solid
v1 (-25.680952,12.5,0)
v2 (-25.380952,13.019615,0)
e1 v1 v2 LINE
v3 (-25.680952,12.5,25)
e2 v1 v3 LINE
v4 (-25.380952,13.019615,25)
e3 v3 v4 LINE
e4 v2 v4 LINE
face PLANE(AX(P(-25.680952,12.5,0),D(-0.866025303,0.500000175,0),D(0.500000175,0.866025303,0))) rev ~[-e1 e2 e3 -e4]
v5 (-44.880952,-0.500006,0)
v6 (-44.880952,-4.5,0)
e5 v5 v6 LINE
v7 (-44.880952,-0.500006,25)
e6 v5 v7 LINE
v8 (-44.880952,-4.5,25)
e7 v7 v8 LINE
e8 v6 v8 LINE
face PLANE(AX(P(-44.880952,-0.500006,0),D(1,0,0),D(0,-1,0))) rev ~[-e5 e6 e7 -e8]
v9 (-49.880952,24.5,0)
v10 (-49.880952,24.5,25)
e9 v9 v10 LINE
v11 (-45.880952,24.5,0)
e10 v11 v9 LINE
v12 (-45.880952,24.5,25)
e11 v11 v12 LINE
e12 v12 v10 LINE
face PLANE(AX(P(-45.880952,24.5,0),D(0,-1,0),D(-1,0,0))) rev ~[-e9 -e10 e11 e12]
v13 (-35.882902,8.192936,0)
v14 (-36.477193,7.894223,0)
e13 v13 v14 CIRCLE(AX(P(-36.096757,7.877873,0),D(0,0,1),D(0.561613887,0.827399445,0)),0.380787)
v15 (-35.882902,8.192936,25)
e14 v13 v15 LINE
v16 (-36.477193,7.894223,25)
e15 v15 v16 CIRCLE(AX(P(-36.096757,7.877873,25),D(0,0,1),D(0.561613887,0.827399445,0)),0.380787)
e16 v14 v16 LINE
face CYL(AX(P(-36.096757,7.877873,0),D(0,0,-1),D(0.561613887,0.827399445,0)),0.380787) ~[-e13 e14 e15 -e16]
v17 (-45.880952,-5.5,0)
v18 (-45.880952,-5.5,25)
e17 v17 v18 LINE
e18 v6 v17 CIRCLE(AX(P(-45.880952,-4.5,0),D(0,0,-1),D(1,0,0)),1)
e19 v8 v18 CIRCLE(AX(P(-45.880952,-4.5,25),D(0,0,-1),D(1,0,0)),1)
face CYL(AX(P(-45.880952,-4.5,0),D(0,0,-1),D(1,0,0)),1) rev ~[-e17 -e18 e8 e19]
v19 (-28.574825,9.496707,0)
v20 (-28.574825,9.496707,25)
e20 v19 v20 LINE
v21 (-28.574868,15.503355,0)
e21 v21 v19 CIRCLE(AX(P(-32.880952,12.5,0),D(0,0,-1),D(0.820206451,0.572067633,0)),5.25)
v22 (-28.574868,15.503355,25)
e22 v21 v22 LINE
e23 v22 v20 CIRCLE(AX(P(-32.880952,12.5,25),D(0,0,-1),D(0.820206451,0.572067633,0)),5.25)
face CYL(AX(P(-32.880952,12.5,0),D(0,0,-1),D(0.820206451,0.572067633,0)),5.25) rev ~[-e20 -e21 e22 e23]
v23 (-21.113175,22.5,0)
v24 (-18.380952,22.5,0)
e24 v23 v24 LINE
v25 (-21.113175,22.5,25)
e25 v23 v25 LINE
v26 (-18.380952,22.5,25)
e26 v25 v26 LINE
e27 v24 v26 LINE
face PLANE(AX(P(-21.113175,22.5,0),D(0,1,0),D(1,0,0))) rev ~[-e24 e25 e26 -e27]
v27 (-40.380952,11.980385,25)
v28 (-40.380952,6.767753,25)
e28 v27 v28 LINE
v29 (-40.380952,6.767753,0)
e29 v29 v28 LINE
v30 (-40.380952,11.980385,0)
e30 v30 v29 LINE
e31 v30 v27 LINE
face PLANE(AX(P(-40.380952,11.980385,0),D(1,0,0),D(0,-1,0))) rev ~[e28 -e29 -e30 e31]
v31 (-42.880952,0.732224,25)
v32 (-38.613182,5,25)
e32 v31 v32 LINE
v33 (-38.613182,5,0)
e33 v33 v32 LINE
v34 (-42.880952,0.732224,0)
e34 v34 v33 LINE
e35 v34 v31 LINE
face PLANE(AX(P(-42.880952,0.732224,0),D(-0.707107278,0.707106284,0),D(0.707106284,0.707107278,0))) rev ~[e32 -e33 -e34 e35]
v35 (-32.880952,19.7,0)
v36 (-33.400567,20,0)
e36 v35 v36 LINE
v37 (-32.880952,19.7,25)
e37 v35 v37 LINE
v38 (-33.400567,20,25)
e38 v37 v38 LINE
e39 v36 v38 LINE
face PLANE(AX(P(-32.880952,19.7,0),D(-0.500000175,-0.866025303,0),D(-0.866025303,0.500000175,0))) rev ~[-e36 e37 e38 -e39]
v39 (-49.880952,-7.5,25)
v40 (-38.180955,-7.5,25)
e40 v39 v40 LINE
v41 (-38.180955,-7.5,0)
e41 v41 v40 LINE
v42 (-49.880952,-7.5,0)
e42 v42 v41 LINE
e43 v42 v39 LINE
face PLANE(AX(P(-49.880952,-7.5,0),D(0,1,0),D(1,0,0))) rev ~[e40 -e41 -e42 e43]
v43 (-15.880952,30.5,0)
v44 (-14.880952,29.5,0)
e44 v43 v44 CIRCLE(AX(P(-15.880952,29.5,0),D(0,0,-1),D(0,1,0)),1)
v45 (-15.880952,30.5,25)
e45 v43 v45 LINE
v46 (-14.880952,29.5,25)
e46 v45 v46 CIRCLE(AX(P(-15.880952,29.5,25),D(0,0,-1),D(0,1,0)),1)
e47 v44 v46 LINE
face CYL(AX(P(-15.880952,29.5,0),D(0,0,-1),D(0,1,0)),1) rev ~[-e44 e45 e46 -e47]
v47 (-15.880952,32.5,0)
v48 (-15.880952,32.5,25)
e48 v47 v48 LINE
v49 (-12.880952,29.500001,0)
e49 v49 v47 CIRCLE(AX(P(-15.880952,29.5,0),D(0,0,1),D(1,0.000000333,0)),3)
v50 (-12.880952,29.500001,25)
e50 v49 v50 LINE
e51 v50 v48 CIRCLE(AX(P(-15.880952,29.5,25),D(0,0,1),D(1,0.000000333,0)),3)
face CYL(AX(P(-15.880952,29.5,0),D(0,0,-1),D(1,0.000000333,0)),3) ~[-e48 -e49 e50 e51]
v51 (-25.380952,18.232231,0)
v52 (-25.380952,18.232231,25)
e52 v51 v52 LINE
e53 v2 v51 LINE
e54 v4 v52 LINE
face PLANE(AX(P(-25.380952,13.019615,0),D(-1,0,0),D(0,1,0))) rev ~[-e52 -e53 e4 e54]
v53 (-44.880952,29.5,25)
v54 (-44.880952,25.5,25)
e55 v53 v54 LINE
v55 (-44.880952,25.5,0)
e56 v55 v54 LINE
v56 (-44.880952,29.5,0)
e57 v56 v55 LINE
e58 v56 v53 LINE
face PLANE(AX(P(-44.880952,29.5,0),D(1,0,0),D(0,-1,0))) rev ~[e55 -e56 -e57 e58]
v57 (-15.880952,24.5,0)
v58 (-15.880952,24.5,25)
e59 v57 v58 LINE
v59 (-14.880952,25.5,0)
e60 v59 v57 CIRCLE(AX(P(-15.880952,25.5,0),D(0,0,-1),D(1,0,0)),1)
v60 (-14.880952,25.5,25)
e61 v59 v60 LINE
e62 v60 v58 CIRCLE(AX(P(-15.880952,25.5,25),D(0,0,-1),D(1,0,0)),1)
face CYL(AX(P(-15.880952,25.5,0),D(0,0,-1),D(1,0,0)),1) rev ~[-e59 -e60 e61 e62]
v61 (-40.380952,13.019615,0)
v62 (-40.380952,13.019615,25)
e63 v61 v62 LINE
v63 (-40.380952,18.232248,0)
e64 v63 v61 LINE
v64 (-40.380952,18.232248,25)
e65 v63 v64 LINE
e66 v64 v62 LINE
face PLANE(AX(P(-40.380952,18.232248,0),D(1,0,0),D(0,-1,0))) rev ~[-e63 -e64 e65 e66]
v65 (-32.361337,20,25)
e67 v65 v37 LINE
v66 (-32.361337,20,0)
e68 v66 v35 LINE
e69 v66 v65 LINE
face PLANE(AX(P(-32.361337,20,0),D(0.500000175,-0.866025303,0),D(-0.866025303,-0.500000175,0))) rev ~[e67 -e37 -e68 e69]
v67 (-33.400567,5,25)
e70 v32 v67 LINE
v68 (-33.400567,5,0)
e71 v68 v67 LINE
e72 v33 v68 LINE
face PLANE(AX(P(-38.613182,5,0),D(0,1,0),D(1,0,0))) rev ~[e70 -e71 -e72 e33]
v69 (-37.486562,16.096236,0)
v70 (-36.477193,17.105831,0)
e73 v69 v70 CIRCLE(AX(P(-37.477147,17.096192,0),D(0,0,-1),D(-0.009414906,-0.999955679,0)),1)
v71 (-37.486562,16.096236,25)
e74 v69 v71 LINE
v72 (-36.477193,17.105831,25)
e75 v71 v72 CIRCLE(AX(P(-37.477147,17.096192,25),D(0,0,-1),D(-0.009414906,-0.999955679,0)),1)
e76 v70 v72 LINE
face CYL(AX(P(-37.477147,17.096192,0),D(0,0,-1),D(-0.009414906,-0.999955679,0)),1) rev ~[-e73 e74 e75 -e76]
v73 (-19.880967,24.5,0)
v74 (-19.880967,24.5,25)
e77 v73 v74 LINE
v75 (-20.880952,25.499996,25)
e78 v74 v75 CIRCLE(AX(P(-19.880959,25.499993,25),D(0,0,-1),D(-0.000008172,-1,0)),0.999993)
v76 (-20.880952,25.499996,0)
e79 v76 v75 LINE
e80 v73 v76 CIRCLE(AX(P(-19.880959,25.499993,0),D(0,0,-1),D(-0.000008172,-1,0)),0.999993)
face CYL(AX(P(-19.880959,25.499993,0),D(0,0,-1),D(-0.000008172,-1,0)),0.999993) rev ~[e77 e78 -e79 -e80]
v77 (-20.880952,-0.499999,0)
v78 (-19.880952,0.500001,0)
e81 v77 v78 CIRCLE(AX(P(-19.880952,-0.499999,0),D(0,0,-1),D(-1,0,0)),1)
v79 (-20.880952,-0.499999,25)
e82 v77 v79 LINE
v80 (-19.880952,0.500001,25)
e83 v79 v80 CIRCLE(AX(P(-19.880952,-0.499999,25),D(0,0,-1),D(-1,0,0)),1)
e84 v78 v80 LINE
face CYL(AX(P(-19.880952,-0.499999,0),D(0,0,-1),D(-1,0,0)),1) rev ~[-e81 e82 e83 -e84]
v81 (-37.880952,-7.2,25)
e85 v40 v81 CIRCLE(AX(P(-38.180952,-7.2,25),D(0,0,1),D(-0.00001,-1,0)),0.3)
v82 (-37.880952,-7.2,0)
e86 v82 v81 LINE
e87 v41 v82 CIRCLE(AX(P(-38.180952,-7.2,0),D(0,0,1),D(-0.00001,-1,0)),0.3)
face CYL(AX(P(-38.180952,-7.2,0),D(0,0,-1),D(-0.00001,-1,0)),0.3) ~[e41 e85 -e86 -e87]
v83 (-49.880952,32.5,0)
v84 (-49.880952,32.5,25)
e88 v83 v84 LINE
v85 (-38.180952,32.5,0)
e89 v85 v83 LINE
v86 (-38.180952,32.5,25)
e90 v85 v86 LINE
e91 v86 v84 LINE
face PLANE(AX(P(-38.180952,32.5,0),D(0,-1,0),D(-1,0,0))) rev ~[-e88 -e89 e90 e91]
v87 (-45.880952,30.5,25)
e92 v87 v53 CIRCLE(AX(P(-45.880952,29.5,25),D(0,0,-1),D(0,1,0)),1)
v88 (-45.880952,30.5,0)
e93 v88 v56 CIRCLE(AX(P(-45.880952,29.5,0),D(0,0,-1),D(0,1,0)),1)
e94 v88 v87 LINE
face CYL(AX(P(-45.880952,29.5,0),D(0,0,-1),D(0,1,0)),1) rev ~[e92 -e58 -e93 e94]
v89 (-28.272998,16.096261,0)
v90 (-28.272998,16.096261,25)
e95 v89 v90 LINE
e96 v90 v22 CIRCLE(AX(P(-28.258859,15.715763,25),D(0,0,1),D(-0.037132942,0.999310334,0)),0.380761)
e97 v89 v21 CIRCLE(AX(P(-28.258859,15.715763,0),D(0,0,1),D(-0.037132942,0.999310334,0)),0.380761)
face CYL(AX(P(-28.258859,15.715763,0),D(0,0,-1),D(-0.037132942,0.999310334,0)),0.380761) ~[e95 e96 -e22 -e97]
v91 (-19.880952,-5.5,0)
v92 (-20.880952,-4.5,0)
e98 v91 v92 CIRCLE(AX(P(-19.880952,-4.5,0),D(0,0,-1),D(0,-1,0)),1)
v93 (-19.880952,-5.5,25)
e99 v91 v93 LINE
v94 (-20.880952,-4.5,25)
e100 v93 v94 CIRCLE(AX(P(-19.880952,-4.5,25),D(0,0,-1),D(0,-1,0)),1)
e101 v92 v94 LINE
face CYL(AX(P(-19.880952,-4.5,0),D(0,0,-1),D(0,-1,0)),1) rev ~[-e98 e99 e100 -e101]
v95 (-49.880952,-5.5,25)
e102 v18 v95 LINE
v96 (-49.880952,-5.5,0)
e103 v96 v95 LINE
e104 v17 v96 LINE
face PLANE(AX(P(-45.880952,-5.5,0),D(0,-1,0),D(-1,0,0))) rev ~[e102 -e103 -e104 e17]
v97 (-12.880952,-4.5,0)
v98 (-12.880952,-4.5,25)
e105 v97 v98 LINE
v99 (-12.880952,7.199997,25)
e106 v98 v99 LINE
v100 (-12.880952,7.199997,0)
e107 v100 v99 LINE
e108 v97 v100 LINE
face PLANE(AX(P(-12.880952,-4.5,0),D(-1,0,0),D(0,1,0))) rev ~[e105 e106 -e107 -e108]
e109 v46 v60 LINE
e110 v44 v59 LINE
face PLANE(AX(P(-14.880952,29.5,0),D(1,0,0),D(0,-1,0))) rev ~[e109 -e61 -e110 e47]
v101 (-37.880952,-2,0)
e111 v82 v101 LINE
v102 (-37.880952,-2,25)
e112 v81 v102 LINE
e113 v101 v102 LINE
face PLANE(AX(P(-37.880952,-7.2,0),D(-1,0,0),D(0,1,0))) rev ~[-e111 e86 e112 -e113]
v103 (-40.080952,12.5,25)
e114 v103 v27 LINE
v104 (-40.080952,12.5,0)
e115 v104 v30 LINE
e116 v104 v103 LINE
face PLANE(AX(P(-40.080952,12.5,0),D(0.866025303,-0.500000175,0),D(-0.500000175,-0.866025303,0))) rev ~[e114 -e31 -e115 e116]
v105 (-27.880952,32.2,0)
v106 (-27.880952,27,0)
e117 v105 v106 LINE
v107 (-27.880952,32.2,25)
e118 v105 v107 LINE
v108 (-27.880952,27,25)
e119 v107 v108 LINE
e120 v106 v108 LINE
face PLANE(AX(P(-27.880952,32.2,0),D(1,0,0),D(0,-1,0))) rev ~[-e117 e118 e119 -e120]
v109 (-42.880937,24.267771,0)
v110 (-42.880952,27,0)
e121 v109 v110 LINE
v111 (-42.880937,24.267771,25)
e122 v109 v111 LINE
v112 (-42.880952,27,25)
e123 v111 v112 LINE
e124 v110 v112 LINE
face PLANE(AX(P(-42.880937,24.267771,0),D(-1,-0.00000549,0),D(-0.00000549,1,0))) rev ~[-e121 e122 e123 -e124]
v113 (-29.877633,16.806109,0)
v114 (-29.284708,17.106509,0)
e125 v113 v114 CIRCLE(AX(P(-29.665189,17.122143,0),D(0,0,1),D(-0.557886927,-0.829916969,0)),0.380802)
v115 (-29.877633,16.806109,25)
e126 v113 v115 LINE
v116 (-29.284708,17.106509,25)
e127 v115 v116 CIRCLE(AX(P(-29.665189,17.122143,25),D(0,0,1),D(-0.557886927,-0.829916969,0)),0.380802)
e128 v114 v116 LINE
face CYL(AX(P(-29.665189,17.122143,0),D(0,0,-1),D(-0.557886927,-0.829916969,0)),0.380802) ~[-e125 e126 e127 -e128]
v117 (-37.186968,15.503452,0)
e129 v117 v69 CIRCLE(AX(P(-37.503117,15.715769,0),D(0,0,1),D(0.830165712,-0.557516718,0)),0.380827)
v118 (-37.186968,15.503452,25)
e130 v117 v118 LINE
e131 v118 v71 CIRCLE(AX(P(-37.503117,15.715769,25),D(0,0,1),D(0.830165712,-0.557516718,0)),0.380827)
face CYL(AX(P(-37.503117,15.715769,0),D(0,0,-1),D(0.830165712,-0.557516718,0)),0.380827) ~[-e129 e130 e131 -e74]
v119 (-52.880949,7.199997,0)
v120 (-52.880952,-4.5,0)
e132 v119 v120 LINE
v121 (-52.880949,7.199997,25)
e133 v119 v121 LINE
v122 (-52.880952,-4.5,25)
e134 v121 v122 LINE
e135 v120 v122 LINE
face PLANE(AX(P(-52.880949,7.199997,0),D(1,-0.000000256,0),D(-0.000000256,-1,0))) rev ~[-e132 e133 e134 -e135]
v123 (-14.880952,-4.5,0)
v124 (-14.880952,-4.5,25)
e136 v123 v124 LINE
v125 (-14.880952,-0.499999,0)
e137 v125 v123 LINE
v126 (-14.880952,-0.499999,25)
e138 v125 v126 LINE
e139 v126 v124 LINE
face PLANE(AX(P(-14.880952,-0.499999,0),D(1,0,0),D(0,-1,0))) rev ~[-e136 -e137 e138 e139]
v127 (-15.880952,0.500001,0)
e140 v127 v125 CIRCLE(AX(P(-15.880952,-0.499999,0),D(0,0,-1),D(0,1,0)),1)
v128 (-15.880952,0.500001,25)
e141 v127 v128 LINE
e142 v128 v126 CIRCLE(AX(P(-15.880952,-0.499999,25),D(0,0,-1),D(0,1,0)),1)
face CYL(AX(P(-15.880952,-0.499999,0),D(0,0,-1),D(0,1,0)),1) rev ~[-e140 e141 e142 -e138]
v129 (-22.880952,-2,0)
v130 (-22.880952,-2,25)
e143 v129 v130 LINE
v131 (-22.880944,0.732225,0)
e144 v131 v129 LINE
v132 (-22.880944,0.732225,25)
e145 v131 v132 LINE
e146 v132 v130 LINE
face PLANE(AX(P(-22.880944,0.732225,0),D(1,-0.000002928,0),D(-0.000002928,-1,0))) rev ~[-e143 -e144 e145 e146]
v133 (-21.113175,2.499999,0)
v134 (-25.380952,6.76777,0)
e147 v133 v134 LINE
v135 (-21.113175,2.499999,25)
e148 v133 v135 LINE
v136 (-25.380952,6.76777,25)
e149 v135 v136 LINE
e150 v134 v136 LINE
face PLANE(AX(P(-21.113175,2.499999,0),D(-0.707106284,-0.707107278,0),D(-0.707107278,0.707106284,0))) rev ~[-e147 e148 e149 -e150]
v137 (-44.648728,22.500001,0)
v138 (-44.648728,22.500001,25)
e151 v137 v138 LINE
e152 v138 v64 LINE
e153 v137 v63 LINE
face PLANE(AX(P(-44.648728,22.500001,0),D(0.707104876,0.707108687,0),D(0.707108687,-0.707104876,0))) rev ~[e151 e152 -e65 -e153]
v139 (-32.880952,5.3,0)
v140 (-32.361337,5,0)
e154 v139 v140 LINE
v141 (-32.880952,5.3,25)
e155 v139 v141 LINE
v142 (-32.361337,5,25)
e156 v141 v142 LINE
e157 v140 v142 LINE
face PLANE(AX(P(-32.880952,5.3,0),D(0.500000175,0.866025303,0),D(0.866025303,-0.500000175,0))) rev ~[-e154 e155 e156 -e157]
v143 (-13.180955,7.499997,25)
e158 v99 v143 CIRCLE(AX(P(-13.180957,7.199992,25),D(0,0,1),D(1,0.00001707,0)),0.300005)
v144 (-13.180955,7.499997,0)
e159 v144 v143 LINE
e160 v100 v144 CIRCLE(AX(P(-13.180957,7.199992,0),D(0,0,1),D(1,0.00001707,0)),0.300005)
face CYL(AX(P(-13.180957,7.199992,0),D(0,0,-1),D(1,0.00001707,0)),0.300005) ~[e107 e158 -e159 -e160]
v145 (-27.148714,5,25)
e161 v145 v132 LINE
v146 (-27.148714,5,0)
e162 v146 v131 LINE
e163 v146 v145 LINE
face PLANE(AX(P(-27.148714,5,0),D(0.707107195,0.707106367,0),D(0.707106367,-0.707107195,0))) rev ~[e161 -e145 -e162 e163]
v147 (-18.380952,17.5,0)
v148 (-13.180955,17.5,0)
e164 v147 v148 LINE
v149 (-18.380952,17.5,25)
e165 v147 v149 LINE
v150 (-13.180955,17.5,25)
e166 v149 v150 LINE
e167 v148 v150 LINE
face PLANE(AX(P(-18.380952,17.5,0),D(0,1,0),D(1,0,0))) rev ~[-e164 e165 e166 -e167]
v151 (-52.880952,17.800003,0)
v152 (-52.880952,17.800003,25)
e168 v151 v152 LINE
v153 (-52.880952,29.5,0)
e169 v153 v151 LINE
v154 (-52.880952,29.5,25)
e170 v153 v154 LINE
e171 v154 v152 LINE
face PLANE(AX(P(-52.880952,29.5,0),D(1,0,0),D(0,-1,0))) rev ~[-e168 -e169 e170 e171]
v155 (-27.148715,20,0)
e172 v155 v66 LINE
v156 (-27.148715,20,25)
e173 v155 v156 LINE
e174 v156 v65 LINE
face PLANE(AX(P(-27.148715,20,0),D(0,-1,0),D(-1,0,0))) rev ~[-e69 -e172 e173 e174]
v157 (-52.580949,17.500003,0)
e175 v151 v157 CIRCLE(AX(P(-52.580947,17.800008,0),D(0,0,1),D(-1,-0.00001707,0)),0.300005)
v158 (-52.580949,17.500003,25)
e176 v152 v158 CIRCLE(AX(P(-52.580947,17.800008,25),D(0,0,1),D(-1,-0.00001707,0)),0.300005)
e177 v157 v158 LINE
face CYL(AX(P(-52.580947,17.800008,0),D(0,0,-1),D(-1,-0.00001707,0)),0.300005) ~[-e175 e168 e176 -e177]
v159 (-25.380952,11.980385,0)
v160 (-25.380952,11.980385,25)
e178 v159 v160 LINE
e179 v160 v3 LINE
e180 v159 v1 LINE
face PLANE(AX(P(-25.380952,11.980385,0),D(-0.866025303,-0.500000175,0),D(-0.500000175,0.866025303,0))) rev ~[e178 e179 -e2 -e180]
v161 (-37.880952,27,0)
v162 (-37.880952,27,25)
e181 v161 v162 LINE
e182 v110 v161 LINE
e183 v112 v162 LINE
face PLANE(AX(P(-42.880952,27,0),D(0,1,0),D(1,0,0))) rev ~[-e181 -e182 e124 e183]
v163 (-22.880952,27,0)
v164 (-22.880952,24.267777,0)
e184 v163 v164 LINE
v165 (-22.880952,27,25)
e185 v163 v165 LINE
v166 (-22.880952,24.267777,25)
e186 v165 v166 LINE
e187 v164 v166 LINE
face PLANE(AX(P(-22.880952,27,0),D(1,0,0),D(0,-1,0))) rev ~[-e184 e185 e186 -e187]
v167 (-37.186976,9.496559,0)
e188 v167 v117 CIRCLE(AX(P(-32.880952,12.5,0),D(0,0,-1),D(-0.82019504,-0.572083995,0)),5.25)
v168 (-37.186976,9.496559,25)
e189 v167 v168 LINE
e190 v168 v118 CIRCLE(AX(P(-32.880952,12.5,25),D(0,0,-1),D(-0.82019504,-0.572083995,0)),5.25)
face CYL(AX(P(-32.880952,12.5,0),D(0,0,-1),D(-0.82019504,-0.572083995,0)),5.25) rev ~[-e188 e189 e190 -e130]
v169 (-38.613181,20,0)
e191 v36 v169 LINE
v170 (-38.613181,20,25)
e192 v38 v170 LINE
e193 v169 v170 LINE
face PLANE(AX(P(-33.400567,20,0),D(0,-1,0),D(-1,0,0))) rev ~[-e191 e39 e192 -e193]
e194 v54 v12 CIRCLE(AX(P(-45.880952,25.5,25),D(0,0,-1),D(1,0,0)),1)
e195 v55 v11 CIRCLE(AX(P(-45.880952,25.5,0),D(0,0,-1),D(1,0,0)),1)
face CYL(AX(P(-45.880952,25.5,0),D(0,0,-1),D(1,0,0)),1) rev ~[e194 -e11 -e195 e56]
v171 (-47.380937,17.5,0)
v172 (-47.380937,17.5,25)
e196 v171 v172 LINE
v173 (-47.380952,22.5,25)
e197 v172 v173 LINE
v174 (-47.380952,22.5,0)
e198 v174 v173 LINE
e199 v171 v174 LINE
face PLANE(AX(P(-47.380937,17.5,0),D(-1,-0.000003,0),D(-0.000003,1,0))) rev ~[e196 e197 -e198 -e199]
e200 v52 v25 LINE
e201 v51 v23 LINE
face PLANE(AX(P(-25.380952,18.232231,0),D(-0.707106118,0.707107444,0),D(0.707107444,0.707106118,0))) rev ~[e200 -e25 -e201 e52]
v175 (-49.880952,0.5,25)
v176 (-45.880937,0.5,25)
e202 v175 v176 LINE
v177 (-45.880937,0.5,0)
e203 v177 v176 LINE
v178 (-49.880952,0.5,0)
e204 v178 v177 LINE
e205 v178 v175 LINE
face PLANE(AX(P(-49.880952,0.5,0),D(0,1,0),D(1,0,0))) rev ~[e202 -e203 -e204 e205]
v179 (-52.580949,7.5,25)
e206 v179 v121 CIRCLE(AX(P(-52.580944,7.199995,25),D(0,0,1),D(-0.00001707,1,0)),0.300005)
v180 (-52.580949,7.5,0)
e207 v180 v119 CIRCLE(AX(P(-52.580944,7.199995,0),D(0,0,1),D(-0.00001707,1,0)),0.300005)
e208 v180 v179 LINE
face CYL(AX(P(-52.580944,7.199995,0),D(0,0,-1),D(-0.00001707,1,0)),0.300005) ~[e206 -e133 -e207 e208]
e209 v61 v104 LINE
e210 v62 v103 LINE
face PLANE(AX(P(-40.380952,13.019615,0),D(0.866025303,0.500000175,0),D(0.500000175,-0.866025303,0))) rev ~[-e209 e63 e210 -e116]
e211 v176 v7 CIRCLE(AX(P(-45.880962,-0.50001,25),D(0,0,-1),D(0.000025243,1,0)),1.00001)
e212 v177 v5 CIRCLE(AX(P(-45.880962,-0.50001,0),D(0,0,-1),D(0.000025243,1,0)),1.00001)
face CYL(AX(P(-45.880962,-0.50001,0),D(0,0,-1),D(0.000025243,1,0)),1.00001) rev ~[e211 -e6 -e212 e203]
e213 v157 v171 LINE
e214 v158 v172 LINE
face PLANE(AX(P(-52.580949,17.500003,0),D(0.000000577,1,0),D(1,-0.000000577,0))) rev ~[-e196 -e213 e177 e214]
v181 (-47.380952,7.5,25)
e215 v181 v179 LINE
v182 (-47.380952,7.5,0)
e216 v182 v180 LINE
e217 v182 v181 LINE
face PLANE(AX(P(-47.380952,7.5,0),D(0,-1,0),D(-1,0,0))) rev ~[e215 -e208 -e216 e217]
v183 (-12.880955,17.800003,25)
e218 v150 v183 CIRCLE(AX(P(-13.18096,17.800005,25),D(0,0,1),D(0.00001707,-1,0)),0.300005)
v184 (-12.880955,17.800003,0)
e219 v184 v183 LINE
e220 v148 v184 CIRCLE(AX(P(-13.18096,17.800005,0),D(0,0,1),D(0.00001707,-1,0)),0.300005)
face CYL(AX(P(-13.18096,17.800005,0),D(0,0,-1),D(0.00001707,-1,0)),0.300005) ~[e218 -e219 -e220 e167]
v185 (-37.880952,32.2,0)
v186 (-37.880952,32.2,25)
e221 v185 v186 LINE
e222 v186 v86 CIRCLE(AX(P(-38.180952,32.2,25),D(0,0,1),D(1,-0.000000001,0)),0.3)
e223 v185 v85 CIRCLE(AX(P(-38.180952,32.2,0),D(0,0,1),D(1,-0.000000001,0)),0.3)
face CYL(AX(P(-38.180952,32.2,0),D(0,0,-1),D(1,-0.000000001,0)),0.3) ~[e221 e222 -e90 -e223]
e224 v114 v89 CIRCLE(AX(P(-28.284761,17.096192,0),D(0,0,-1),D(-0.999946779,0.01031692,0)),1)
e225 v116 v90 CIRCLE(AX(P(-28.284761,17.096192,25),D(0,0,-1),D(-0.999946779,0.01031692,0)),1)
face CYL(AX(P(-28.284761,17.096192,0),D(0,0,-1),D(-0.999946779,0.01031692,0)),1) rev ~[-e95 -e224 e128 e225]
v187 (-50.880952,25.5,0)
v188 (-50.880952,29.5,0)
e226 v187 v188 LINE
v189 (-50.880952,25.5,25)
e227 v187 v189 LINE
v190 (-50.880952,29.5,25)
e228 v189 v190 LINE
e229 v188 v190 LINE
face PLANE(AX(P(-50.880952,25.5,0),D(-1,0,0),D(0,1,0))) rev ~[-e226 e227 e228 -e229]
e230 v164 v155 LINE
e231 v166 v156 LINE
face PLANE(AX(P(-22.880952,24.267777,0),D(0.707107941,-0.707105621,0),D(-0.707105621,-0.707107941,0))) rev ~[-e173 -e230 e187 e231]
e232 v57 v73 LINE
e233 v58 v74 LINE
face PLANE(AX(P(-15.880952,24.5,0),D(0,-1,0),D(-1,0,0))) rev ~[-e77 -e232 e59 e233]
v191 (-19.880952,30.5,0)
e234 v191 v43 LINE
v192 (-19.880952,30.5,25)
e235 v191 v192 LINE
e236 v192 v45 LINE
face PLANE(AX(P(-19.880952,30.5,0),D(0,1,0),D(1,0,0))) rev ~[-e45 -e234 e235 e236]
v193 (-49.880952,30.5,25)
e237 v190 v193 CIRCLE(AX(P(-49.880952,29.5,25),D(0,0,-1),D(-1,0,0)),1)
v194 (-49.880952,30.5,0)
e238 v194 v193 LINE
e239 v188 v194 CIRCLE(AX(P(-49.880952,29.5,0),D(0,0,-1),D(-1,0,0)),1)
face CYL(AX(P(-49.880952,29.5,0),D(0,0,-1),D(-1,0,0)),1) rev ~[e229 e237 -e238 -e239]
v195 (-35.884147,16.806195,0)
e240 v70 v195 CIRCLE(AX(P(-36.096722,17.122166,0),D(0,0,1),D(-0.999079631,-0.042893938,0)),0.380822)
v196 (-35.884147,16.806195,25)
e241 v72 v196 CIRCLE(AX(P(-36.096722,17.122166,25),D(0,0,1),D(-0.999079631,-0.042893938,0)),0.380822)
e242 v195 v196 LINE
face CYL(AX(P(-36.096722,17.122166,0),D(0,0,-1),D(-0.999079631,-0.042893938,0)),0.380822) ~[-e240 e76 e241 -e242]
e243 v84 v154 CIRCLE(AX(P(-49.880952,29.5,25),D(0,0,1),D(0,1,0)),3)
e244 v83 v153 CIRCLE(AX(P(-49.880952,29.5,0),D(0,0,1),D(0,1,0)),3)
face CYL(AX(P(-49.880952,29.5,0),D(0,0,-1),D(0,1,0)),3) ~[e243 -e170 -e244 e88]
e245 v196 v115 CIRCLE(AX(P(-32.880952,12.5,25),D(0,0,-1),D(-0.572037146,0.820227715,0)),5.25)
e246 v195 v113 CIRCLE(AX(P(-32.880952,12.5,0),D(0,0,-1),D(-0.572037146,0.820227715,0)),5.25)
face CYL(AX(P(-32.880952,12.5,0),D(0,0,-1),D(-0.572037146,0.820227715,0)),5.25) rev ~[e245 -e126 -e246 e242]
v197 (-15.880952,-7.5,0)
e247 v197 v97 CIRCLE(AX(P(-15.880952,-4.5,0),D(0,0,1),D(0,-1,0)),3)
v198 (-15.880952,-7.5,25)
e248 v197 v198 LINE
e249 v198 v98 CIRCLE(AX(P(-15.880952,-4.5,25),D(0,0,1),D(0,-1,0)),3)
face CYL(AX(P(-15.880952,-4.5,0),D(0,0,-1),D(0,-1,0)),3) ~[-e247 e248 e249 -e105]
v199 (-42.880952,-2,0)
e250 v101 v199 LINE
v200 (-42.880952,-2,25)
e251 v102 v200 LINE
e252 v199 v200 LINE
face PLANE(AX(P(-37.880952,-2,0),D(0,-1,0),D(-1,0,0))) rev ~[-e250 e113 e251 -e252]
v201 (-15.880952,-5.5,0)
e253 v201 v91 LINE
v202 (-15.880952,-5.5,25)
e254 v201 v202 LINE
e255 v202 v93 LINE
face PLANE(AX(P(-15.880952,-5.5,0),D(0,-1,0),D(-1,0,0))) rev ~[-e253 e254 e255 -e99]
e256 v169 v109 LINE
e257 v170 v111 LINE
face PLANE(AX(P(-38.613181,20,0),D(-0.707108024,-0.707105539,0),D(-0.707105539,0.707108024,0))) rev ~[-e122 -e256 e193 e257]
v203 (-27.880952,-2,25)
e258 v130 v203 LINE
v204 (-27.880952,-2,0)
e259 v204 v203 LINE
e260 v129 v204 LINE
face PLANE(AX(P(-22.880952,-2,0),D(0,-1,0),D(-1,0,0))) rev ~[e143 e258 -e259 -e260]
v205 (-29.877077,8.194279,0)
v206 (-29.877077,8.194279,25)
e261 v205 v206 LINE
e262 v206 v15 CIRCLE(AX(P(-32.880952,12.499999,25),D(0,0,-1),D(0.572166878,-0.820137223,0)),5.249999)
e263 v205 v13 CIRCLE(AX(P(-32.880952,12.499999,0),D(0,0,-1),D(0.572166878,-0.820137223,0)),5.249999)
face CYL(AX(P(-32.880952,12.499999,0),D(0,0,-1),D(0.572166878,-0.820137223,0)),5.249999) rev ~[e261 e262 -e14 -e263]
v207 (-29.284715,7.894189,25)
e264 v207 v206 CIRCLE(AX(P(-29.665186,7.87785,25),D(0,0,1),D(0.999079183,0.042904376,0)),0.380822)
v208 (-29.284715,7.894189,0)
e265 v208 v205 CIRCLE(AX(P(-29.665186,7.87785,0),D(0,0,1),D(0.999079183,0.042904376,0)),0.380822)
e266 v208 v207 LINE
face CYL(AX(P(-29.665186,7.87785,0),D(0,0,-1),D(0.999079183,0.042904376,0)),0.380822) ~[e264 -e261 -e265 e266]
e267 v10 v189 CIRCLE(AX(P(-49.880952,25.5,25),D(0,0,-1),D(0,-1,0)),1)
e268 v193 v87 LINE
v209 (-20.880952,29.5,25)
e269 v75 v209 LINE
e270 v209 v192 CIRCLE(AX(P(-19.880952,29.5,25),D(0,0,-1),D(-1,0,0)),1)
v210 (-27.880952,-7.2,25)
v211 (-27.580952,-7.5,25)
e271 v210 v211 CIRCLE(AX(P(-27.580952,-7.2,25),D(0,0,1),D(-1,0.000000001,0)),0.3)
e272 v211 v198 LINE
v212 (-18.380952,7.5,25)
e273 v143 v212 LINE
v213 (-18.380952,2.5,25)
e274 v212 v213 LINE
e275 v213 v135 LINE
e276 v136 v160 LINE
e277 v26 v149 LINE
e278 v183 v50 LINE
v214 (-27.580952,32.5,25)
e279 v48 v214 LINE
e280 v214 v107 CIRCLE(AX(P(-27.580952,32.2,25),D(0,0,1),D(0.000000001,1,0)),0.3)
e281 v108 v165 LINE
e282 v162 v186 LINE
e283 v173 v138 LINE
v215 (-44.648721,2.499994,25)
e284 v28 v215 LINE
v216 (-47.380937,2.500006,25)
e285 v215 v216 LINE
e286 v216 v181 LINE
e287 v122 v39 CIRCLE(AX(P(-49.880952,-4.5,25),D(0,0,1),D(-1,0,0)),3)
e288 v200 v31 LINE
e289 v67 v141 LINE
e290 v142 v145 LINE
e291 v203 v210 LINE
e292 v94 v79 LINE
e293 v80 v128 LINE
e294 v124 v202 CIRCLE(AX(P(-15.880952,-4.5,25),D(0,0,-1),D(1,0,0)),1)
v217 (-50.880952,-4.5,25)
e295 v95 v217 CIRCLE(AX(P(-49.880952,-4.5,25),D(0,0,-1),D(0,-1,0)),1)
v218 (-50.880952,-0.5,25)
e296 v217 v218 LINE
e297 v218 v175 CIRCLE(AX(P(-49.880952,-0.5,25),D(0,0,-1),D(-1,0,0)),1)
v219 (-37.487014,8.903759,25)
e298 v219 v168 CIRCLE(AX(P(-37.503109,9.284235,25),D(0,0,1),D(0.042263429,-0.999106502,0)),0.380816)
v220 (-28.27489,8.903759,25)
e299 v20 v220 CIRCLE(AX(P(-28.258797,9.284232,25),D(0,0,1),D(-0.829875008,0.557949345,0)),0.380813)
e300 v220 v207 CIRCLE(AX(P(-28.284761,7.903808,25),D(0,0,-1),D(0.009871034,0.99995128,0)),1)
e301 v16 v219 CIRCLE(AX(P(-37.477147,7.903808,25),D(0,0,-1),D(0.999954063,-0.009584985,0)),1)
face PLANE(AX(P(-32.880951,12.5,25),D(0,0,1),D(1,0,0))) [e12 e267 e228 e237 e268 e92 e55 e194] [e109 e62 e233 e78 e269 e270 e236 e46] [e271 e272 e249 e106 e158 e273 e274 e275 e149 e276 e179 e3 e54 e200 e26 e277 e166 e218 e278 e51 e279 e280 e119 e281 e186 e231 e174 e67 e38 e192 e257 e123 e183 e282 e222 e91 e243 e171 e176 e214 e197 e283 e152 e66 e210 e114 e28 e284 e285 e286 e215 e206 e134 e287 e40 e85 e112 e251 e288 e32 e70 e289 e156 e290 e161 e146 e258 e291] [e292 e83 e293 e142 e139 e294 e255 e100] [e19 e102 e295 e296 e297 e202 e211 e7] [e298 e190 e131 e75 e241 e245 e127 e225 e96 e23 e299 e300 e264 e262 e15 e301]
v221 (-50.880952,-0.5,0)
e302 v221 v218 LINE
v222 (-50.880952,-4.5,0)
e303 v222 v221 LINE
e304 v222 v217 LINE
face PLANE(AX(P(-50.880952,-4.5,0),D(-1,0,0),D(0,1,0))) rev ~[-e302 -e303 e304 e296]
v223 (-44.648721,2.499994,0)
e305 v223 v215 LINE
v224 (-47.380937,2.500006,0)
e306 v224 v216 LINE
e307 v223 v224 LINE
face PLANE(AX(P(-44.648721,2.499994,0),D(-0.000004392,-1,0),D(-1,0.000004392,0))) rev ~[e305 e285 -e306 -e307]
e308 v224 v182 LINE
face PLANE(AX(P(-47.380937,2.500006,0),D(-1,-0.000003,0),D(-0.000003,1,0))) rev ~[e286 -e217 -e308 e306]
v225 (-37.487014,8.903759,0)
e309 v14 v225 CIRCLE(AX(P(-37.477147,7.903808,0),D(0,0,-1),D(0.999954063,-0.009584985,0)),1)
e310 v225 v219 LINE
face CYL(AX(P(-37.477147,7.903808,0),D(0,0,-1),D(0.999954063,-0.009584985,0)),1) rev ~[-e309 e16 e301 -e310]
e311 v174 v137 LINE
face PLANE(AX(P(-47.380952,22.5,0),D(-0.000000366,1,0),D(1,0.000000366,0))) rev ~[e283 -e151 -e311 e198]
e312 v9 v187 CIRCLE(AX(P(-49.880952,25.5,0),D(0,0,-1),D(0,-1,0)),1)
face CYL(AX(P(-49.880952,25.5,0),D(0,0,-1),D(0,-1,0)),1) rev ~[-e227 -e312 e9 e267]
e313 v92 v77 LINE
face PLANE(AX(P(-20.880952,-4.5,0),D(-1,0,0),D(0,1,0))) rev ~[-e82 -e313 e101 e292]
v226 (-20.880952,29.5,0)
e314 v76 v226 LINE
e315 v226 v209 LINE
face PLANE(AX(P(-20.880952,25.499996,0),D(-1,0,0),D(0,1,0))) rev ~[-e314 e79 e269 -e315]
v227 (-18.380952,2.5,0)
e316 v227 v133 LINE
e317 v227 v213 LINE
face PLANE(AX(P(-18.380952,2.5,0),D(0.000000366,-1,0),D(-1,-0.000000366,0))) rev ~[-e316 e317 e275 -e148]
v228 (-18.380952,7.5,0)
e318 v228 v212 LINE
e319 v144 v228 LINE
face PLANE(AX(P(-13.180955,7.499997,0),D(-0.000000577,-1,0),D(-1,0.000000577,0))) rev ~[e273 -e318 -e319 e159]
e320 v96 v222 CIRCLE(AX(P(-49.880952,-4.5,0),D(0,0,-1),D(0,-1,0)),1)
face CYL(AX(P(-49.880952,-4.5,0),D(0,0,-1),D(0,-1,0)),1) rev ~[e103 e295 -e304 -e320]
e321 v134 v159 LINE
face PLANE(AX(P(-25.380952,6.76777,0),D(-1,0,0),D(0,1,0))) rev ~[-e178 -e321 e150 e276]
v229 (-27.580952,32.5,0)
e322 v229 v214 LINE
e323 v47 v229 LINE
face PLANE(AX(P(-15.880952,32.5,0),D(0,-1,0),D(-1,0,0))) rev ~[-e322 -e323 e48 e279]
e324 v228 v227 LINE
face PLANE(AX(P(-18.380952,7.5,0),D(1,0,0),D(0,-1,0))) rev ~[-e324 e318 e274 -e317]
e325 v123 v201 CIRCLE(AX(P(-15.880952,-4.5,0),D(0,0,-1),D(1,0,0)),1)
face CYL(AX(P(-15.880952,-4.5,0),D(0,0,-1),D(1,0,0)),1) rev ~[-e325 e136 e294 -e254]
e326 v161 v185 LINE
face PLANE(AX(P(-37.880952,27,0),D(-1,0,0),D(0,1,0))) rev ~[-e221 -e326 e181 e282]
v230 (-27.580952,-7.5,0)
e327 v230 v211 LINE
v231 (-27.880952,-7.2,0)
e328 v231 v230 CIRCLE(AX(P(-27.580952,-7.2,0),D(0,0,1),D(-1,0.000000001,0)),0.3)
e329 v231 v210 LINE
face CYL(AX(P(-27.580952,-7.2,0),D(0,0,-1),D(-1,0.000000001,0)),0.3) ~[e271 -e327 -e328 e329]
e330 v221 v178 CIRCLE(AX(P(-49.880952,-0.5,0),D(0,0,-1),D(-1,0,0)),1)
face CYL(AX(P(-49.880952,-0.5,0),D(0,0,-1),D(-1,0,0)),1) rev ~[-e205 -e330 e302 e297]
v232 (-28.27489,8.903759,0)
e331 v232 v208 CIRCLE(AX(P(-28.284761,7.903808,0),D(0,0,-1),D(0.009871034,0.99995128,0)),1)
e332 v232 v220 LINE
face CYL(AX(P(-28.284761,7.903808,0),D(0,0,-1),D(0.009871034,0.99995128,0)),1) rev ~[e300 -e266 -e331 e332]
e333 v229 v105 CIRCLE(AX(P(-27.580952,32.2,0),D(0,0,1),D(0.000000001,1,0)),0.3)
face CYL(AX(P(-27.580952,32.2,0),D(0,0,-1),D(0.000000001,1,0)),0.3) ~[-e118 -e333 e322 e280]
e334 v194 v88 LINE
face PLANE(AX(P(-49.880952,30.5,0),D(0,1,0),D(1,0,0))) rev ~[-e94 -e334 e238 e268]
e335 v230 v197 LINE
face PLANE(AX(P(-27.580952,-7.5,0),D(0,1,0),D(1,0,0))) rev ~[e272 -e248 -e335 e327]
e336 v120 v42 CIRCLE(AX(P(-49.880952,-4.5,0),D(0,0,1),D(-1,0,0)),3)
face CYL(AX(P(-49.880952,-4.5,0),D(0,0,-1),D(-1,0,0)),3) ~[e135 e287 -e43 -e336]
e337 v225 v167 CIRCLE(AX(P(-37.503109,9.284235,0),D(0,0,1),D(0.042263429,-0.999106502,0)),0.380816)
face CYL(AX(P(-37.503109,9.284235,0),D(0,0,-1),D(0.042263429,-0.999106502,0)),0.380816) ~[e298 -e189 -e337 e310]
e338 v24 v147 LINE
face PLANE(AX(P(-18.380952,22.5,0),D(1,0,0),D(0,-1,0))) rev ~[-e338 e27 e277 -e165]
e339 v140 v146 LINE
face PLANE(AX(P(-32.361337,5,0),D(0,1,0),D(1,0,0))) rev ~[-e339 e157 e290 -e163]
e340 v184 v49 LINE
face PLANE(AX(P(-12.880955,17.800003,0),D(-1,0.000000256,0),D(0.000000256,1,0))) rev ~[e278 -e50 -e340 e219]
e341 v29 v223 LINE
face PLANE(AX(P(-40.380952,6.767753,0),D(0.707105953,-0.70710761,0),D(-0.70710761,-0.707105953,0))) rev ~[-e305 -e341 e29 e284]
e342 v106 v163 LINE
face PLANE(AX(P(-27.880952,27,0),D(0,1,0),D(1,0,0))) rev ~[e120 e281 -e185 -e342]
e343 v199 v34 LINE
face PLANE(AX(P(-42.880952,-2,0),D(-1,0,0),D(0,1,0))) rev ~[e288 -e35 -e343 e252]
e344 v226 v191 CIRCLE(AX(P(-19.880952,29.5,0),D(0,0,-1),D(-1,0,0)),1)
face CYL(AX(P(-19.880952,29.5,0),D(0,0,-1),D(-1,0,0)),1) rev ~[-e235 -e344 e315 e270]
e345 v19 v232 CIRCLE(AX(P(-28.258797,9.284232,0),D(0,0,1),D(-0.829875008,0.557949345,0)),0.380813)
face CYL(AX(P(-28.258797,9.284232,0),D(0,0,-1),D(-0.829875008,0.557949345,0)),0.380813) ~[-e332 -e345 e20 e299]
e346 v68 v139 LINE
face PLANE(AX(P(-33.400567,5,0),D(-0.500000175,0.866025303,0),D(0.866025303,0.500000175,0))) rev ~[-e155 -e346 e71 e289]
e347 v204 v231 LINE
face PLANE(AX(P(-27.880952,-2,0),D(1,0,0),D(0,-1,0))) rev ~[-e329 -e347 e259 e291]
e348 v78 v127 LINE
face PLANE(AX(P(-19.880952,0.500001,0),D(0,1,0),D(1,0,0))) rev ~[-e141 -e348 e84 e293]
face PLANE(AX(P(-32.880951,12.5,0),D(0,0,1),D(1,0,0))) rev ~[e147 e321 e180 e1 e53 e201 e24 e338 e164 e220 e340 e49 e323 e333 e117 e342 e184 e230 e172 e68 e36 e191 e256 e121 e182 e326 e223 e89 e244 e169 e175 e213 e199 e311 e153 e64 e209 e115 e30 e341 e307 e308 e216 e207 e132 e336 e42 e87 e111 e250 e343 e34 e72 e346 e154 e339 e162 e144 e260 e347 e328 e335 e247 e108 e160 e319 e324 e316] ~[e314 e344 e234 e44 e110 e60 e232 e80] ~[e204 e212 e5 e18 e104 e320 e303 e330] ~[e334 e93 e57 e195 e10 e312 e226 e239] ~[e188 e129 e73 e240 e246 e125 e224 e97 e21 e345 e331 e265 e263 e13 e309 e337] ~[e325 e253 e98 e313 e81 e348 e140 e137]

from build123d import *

# Parameters (mm, degrees)
F1_DEPTH = 25


# Not quite as in the source:
# - ends of sketch curves that miss each other by under 0.0002 mm in the source are joined


with BuildPart() as f1:
    # F0 (on Top) → F1 (new body)
    with BuildSketch(Plane.XY):
        with BuildLine():
            Line((-18.380952, 17.5), (-13.180955, 17.5))
            ThreePointArc((-13.180955, 17.5), (-12.9688229656, 17.5878709656), (-12.880955, 17.800003))
            Line((-12.880955, 17.800003), (-12.880952, 29.500001))
            ThreePointArc((-12.880952, 29.500001), (-13.7596316564, 31.6213203436), (-15.880952, 32.5))
            Line((-15.880952, 32.5), (-27.580952, 32.5))
            ThreePointArc((-27.580952, 32.5), (-27.7930840344, 32.4121320344), (-27.880952, 32.2))
            Line((-27.880952, 32.2), (-27.880952, 27))
            Line((-27.880952, 27), (-22.880952, 27))
            Line((-22.880952, 27), (-22.880952, 24.267777))
            Line((-22.880952, 24.267777), (-27.148715, 20))
            Line((-27.148715, 20), (-32.361337, 20))
            Line((-32.361337, 20), (-32.880952, 19.7))
            Line((-32.880952, 19.7), (-33.400567, 20))
            Line((-33.400567, 20), (-38.613181, 20))
            Line((-38.613181, 20), (-42.880937, 24.267771))
            Line((-42.880937, 24.267771), (-42.880952, 27))
            Line((-42.880952, 27), (-37.880952, 27))
            Line((-37.880952, 27), (-37.880952, 32.2))
            ThreePointArc((-37.880952, 32.2), (-37.9688199656, 32.4121320344), (-38.180952, 32.5))
            Line((-38.180952, 32.5), (-49.880952, 32.5))
            ThreePointArc((-49.880952, 32.5), (-52.0022723436, 31.6213203436), (-52.880952, 29.5))
            Line((-52.880952, 29.5), (-52.880952, 17.800003))
            ThreePointArc((-52.880952, 17.800003), (-52.7930810344, 17.5878709656), (-52.580949, 17.500003))
            Line((-52.580949, 17.500003), (-47.380937, 17.5))
            Line((-47.380937, 17.5), (-47.380952, 22.5))
            Line((-47.380952, 22.5), (-44.648728, 22.500001))
            Line((-44.648728, 22.500001), (-40.380952, 18.232248))
            Line((-40.380952, 18.232248), (-40.380952, 13.019615))
            Line((-40.380952, 13.019615), (-40.080952, 12.5))
            Line((-40.080952, 12.5), (-40.380952, 11.980385))
            Line((-40.380952, 11.980385), (-40.380952, 6.767753))
            Line((-40.380952, 6.767753), (-44.648721, 2.499994))
            Line((-44.648721, 2.499994), (-47.380937, 2.500006))
            Line((-47.380937, 2.500006), (-47.380952, 7.5))
            Line((-47.380952, 7.5), (-52.580949, 7.5))
            ThreePointArc((-52.580949, 7.5), (-52.7930810344, 7.4121290344), (-52.880949, 7.199997))
            Line((-52.880949, 7.199997), (-52.880952, -4.5))
            ThreePointArc((-52.880952, -4.5), (-52.0022723436, -6.6213203436), (-49.880952, -7.5))
            Line((-49.880952, -7.5), (-38.180955, -7.5))
            ThreePointArc((-38.180955, -7.5), (-37.9688199656, -7.4121320344), (-37.880952, -7.2))
            Line((-37.880952, -7.2), (-37.880952, -2))
            Line((-37.880952, -2), (-42.880952, -2))
            Line((-42.880952, -2), (-42.880952, 0.732224))
            Line((-42.880952, 0.732224), (-38.613182, 5))
            Line((-38.613182, 5), (-33.400567, 5))
            Line((-33.400567, 5), (-32.880952, 5.3))
            Line((-32.880952, 5.3), (-32.361337, 5))
            Line((-32.361337, 5), (-27.148714, 5))
            Line((-27.148714, 5), (-22.880944, 0.732225))
            Line((-22.880944, 0.732225), (-22.880952, -2))
            Line((-22.880952, -2), (-27.880952, -2))
            Line((-27.880952, -2), (-27.880952, -7.2))
            ThreePointArc((-27.880952, -7.2), (-27.7930840344, -7.4121320344), (-27.580952, -7.5))
            Line((-27.580952, -7.5), (-15.880952, -7.5))
            ThreePointArc((-15.880952, -7.5), (-13.7596316564, -6.6213203436), (-12.880952, -4.5))
            Line((-12.880952, -4.5), (-12.880952, 7.199997))
            ThreePointArc((-12.880952, 7.199997), (-12.9688229656, 7.4121290344), (-13.180955, 7.499997))
            Line((-13.180955, 7.499997), (-18.380952, 7.5))
            Line((-18.380952, 7.5), (-18.380952, 2.5))
            Line((-18.380952, 2.5), (-21.113175, 2.499999))
            Line((-21.113175, 2.499999), (-25.380952, 6.76777))
            Line((-25.380952, 6.76777), (-25.380952, 11.980385))
            Line((-25.380952, 11.980385), (-25.680952, 12.5))
            Line((-25.680952, 12.5), (-25.380952, 13.019615))
            Line((-25.380952, 13.019615), (-25.380952, 18.232231))
            Line((-25.380952, 18.232231), (-21.113175, 22.5))
            Line((-21.113175, 22.5), (-18.380952, 22.5))
            Line((-18.380952, 22.5), (-18.380952, 17.5))
        make_face()
        with BuildLine():
            ThreePointArc((-50.880952, -0.5), (-50.5880587812, 0.2071067812), (-49.880952, 0.5))
            Line((-49.880952, 0.5), (-45.880937, 0.5))
            ThreePointArc((-45.880937, 0.5), (-45.1738452188, 0.2071007812), (-44.880952, -0.500006))
            Line((-44.880952, -0.500006), (-44.880952, -4.5))
            ThreePointArc((-44.880952, -4.5), (-45.1738452188, -5.2071067812), (-45.880952, -5.5))
            Line((-45.880952, -5.5), (-49.880952, -5.5))
            ThreePointArc((-49.880952, -5.5), (-50.5880587812, -5.2071067812), (-50.880952, -4.5))
            Line((-50.880952, -4.5), (-50.880952, -0.5))
        make_face(mode=Mode.SUBTRACT)
        with BuildLine():
            Line((-14.880952, -0.499999), (-14.880952, -4.5))
            ThreePointArc((-14.880952, -4.5), (-15.1738452188, -5.2071067812), (-15.880952, -5.5))
            Line((-15.880952, -5.5), (-19.880952, -5.5))
            ThreePointArc((-19.880952, -5.5), (-20.5880587812, -5.2071067812), (-20.880952, -4.5))
            Line((-20.880952, -4.5), (-20.880952, -0.499999))
            ThreePointArc((-20.880952, -0.499999), (-20.5880587812, 0.2071077812), (-19.880952, 0.500001))
            Line((-19.880952, 0.500001), (-15.880952, 0.500001))
            ThreePointArc((-15.880952, 0.500001), (-15.1738452188, 0.2071077812), (-14.880952, -0.499999))
        make_face(mode=Mode.SUBTRACT)
        with BuildLine():
            ThreePointArc((-37.1869759587, 9.4965590288), (-38.130952, 12.5000067994), (-37.186968179, 15.5034521248))
            ThreePointArc((-37.186968179, 15.5034521248), (-37.1632332946, 15.8875474988), (-37.4865620002, 16.0962359962))
            ThreePointArc((-37.4865620002, 16.0962359962), (-38.1843329758, 17.8032195777), (-36.4771934562, 17.1058309956))
            ThreePointArc((-36.4771934562, 17.1058309956), (-36.2684563797, 16.7822649872), (-35.8841472989, 16.8061954442))
            ThreePointArc((-35.8841472989, 16.8061954442), (-32.8808765483, 17.7499999995), (-29.8776329856, 16.8061090207))
            ThreePointArc((-29.8776329856, 16.8061090207), (-29.4930868042, 16.7824504958), (-29.2847080657, 17.1065090027))
            ThreePointArc((-29.2847080657, 17.1065090027), (-27.578165673, 17.8038098657), (-28.2729980022, 16.0962611865))
            ThreePointArc((-28.2729980022, 16.0962611865), (-28.5981729586, 15.8885199872), (-28.5748681009, 15.5033549322))
            ThreePointArc((-28.5748681009, 15.5033549322), (-27.6309520001, 12.5000377259), (-28.5748248894, 9.4967069229))
            ThreePointArc((-28.5748248894, 9.4967069229), (-28.5986102211, 9.1123426938), (-28.2748899919, 8.9037591925))
            ThreePointArc((-28.2748899919, 8.9037591925), (-27.577743326, 7.1966121229), (-29.2847147364, 7.8941890025))
            ThreePointArc((-29.2847147364, 7.8941890025), (-29.493086142, 8.2175661088), (-29.8770772102, 8.1942793139))
            ThreePointArc((-29.8770772102, 8.1942793139), (-32.8797784079, 7.2500001312), (-35.8829017766, 8.1929363205))
            ThreePointArc((-35.8829017766, 8.1929363205), (-36.2677680781, 8.2180997059), (-36.4771928672, 7.8942229943))
            ThreePointArc((-36.4771928672, 7.8942229943), (-38.1841540665, 7.1966015182), (-37.4870140032, 8.9037593199))
            ThreePointArc((-37.4870140032, 8.9037593199), (-37.1633341924, 9.1122631312), (-37.1869759587, 9.4965590288))
        make_face(mode=Mode.SUBTRACT)
        with BuildLine():
            Line((-49.880952, 30.5), (-45.880952, 30.5))
            ThreePointArc((-45.880952, 30.5), (-45.1738452188, 30.2071067812), (-44.880952, 29.5))
            Line((-44.880952, 29.5), (-44.880952, 25.5))
            ThreePointArc((-44.880952, 25.5), (-45.1738452188, 24.7928932188), (-45.880952, 24.5))
            Line((-45.880952, 24.5), (-49.880952, 24.5))
            ThreePointArc((-49.880952, 24.5), (-50.5880587812, 24.7928932188), (-50.880952, 25.5))
            Line((-50.880952, 25.5), (-50.880952, 29.5))
            ThreePointArc((-50.880952, 29.5), (-50.5880587812, 30.2071067812), (-49.880952, 30.5))
        make_face(mode=Mode.SUBTRACT)
        with BuildLine():
            ThreePointArc((-15.880952, 30.5), (-15.1738452188, 30.2071067812), (-14.880952, 29.5))
            Line((-14.880952, 29.5), (-14.880952, 25.5))
            ThreePointArc((-14.880952, 25.5), (-15.1738452188, 24.7928932188), (-15.880952, 24.5))
            Line((-15.880952, 24.5), (-19.880967, 24.5))
            ThreePointArc((-19.880967, 24.5), (-20.5880587812, 24.7928892188), (-20.880952, 25.499996))
            Line((-20.880952, 25.499996), (-20.880952, 29.5))
            ThreePointArc((-20.880952, 29.5), (-20.5880587812, 30.2071067812), (-19.880952, 30.5))
            Line((-19.880952, 30.5), (-15.880952, 30.5))
        make_face(mode=Mode.SUBTRACT)
    extrude(amount=F1_DEPTH)


solid = f1.part
